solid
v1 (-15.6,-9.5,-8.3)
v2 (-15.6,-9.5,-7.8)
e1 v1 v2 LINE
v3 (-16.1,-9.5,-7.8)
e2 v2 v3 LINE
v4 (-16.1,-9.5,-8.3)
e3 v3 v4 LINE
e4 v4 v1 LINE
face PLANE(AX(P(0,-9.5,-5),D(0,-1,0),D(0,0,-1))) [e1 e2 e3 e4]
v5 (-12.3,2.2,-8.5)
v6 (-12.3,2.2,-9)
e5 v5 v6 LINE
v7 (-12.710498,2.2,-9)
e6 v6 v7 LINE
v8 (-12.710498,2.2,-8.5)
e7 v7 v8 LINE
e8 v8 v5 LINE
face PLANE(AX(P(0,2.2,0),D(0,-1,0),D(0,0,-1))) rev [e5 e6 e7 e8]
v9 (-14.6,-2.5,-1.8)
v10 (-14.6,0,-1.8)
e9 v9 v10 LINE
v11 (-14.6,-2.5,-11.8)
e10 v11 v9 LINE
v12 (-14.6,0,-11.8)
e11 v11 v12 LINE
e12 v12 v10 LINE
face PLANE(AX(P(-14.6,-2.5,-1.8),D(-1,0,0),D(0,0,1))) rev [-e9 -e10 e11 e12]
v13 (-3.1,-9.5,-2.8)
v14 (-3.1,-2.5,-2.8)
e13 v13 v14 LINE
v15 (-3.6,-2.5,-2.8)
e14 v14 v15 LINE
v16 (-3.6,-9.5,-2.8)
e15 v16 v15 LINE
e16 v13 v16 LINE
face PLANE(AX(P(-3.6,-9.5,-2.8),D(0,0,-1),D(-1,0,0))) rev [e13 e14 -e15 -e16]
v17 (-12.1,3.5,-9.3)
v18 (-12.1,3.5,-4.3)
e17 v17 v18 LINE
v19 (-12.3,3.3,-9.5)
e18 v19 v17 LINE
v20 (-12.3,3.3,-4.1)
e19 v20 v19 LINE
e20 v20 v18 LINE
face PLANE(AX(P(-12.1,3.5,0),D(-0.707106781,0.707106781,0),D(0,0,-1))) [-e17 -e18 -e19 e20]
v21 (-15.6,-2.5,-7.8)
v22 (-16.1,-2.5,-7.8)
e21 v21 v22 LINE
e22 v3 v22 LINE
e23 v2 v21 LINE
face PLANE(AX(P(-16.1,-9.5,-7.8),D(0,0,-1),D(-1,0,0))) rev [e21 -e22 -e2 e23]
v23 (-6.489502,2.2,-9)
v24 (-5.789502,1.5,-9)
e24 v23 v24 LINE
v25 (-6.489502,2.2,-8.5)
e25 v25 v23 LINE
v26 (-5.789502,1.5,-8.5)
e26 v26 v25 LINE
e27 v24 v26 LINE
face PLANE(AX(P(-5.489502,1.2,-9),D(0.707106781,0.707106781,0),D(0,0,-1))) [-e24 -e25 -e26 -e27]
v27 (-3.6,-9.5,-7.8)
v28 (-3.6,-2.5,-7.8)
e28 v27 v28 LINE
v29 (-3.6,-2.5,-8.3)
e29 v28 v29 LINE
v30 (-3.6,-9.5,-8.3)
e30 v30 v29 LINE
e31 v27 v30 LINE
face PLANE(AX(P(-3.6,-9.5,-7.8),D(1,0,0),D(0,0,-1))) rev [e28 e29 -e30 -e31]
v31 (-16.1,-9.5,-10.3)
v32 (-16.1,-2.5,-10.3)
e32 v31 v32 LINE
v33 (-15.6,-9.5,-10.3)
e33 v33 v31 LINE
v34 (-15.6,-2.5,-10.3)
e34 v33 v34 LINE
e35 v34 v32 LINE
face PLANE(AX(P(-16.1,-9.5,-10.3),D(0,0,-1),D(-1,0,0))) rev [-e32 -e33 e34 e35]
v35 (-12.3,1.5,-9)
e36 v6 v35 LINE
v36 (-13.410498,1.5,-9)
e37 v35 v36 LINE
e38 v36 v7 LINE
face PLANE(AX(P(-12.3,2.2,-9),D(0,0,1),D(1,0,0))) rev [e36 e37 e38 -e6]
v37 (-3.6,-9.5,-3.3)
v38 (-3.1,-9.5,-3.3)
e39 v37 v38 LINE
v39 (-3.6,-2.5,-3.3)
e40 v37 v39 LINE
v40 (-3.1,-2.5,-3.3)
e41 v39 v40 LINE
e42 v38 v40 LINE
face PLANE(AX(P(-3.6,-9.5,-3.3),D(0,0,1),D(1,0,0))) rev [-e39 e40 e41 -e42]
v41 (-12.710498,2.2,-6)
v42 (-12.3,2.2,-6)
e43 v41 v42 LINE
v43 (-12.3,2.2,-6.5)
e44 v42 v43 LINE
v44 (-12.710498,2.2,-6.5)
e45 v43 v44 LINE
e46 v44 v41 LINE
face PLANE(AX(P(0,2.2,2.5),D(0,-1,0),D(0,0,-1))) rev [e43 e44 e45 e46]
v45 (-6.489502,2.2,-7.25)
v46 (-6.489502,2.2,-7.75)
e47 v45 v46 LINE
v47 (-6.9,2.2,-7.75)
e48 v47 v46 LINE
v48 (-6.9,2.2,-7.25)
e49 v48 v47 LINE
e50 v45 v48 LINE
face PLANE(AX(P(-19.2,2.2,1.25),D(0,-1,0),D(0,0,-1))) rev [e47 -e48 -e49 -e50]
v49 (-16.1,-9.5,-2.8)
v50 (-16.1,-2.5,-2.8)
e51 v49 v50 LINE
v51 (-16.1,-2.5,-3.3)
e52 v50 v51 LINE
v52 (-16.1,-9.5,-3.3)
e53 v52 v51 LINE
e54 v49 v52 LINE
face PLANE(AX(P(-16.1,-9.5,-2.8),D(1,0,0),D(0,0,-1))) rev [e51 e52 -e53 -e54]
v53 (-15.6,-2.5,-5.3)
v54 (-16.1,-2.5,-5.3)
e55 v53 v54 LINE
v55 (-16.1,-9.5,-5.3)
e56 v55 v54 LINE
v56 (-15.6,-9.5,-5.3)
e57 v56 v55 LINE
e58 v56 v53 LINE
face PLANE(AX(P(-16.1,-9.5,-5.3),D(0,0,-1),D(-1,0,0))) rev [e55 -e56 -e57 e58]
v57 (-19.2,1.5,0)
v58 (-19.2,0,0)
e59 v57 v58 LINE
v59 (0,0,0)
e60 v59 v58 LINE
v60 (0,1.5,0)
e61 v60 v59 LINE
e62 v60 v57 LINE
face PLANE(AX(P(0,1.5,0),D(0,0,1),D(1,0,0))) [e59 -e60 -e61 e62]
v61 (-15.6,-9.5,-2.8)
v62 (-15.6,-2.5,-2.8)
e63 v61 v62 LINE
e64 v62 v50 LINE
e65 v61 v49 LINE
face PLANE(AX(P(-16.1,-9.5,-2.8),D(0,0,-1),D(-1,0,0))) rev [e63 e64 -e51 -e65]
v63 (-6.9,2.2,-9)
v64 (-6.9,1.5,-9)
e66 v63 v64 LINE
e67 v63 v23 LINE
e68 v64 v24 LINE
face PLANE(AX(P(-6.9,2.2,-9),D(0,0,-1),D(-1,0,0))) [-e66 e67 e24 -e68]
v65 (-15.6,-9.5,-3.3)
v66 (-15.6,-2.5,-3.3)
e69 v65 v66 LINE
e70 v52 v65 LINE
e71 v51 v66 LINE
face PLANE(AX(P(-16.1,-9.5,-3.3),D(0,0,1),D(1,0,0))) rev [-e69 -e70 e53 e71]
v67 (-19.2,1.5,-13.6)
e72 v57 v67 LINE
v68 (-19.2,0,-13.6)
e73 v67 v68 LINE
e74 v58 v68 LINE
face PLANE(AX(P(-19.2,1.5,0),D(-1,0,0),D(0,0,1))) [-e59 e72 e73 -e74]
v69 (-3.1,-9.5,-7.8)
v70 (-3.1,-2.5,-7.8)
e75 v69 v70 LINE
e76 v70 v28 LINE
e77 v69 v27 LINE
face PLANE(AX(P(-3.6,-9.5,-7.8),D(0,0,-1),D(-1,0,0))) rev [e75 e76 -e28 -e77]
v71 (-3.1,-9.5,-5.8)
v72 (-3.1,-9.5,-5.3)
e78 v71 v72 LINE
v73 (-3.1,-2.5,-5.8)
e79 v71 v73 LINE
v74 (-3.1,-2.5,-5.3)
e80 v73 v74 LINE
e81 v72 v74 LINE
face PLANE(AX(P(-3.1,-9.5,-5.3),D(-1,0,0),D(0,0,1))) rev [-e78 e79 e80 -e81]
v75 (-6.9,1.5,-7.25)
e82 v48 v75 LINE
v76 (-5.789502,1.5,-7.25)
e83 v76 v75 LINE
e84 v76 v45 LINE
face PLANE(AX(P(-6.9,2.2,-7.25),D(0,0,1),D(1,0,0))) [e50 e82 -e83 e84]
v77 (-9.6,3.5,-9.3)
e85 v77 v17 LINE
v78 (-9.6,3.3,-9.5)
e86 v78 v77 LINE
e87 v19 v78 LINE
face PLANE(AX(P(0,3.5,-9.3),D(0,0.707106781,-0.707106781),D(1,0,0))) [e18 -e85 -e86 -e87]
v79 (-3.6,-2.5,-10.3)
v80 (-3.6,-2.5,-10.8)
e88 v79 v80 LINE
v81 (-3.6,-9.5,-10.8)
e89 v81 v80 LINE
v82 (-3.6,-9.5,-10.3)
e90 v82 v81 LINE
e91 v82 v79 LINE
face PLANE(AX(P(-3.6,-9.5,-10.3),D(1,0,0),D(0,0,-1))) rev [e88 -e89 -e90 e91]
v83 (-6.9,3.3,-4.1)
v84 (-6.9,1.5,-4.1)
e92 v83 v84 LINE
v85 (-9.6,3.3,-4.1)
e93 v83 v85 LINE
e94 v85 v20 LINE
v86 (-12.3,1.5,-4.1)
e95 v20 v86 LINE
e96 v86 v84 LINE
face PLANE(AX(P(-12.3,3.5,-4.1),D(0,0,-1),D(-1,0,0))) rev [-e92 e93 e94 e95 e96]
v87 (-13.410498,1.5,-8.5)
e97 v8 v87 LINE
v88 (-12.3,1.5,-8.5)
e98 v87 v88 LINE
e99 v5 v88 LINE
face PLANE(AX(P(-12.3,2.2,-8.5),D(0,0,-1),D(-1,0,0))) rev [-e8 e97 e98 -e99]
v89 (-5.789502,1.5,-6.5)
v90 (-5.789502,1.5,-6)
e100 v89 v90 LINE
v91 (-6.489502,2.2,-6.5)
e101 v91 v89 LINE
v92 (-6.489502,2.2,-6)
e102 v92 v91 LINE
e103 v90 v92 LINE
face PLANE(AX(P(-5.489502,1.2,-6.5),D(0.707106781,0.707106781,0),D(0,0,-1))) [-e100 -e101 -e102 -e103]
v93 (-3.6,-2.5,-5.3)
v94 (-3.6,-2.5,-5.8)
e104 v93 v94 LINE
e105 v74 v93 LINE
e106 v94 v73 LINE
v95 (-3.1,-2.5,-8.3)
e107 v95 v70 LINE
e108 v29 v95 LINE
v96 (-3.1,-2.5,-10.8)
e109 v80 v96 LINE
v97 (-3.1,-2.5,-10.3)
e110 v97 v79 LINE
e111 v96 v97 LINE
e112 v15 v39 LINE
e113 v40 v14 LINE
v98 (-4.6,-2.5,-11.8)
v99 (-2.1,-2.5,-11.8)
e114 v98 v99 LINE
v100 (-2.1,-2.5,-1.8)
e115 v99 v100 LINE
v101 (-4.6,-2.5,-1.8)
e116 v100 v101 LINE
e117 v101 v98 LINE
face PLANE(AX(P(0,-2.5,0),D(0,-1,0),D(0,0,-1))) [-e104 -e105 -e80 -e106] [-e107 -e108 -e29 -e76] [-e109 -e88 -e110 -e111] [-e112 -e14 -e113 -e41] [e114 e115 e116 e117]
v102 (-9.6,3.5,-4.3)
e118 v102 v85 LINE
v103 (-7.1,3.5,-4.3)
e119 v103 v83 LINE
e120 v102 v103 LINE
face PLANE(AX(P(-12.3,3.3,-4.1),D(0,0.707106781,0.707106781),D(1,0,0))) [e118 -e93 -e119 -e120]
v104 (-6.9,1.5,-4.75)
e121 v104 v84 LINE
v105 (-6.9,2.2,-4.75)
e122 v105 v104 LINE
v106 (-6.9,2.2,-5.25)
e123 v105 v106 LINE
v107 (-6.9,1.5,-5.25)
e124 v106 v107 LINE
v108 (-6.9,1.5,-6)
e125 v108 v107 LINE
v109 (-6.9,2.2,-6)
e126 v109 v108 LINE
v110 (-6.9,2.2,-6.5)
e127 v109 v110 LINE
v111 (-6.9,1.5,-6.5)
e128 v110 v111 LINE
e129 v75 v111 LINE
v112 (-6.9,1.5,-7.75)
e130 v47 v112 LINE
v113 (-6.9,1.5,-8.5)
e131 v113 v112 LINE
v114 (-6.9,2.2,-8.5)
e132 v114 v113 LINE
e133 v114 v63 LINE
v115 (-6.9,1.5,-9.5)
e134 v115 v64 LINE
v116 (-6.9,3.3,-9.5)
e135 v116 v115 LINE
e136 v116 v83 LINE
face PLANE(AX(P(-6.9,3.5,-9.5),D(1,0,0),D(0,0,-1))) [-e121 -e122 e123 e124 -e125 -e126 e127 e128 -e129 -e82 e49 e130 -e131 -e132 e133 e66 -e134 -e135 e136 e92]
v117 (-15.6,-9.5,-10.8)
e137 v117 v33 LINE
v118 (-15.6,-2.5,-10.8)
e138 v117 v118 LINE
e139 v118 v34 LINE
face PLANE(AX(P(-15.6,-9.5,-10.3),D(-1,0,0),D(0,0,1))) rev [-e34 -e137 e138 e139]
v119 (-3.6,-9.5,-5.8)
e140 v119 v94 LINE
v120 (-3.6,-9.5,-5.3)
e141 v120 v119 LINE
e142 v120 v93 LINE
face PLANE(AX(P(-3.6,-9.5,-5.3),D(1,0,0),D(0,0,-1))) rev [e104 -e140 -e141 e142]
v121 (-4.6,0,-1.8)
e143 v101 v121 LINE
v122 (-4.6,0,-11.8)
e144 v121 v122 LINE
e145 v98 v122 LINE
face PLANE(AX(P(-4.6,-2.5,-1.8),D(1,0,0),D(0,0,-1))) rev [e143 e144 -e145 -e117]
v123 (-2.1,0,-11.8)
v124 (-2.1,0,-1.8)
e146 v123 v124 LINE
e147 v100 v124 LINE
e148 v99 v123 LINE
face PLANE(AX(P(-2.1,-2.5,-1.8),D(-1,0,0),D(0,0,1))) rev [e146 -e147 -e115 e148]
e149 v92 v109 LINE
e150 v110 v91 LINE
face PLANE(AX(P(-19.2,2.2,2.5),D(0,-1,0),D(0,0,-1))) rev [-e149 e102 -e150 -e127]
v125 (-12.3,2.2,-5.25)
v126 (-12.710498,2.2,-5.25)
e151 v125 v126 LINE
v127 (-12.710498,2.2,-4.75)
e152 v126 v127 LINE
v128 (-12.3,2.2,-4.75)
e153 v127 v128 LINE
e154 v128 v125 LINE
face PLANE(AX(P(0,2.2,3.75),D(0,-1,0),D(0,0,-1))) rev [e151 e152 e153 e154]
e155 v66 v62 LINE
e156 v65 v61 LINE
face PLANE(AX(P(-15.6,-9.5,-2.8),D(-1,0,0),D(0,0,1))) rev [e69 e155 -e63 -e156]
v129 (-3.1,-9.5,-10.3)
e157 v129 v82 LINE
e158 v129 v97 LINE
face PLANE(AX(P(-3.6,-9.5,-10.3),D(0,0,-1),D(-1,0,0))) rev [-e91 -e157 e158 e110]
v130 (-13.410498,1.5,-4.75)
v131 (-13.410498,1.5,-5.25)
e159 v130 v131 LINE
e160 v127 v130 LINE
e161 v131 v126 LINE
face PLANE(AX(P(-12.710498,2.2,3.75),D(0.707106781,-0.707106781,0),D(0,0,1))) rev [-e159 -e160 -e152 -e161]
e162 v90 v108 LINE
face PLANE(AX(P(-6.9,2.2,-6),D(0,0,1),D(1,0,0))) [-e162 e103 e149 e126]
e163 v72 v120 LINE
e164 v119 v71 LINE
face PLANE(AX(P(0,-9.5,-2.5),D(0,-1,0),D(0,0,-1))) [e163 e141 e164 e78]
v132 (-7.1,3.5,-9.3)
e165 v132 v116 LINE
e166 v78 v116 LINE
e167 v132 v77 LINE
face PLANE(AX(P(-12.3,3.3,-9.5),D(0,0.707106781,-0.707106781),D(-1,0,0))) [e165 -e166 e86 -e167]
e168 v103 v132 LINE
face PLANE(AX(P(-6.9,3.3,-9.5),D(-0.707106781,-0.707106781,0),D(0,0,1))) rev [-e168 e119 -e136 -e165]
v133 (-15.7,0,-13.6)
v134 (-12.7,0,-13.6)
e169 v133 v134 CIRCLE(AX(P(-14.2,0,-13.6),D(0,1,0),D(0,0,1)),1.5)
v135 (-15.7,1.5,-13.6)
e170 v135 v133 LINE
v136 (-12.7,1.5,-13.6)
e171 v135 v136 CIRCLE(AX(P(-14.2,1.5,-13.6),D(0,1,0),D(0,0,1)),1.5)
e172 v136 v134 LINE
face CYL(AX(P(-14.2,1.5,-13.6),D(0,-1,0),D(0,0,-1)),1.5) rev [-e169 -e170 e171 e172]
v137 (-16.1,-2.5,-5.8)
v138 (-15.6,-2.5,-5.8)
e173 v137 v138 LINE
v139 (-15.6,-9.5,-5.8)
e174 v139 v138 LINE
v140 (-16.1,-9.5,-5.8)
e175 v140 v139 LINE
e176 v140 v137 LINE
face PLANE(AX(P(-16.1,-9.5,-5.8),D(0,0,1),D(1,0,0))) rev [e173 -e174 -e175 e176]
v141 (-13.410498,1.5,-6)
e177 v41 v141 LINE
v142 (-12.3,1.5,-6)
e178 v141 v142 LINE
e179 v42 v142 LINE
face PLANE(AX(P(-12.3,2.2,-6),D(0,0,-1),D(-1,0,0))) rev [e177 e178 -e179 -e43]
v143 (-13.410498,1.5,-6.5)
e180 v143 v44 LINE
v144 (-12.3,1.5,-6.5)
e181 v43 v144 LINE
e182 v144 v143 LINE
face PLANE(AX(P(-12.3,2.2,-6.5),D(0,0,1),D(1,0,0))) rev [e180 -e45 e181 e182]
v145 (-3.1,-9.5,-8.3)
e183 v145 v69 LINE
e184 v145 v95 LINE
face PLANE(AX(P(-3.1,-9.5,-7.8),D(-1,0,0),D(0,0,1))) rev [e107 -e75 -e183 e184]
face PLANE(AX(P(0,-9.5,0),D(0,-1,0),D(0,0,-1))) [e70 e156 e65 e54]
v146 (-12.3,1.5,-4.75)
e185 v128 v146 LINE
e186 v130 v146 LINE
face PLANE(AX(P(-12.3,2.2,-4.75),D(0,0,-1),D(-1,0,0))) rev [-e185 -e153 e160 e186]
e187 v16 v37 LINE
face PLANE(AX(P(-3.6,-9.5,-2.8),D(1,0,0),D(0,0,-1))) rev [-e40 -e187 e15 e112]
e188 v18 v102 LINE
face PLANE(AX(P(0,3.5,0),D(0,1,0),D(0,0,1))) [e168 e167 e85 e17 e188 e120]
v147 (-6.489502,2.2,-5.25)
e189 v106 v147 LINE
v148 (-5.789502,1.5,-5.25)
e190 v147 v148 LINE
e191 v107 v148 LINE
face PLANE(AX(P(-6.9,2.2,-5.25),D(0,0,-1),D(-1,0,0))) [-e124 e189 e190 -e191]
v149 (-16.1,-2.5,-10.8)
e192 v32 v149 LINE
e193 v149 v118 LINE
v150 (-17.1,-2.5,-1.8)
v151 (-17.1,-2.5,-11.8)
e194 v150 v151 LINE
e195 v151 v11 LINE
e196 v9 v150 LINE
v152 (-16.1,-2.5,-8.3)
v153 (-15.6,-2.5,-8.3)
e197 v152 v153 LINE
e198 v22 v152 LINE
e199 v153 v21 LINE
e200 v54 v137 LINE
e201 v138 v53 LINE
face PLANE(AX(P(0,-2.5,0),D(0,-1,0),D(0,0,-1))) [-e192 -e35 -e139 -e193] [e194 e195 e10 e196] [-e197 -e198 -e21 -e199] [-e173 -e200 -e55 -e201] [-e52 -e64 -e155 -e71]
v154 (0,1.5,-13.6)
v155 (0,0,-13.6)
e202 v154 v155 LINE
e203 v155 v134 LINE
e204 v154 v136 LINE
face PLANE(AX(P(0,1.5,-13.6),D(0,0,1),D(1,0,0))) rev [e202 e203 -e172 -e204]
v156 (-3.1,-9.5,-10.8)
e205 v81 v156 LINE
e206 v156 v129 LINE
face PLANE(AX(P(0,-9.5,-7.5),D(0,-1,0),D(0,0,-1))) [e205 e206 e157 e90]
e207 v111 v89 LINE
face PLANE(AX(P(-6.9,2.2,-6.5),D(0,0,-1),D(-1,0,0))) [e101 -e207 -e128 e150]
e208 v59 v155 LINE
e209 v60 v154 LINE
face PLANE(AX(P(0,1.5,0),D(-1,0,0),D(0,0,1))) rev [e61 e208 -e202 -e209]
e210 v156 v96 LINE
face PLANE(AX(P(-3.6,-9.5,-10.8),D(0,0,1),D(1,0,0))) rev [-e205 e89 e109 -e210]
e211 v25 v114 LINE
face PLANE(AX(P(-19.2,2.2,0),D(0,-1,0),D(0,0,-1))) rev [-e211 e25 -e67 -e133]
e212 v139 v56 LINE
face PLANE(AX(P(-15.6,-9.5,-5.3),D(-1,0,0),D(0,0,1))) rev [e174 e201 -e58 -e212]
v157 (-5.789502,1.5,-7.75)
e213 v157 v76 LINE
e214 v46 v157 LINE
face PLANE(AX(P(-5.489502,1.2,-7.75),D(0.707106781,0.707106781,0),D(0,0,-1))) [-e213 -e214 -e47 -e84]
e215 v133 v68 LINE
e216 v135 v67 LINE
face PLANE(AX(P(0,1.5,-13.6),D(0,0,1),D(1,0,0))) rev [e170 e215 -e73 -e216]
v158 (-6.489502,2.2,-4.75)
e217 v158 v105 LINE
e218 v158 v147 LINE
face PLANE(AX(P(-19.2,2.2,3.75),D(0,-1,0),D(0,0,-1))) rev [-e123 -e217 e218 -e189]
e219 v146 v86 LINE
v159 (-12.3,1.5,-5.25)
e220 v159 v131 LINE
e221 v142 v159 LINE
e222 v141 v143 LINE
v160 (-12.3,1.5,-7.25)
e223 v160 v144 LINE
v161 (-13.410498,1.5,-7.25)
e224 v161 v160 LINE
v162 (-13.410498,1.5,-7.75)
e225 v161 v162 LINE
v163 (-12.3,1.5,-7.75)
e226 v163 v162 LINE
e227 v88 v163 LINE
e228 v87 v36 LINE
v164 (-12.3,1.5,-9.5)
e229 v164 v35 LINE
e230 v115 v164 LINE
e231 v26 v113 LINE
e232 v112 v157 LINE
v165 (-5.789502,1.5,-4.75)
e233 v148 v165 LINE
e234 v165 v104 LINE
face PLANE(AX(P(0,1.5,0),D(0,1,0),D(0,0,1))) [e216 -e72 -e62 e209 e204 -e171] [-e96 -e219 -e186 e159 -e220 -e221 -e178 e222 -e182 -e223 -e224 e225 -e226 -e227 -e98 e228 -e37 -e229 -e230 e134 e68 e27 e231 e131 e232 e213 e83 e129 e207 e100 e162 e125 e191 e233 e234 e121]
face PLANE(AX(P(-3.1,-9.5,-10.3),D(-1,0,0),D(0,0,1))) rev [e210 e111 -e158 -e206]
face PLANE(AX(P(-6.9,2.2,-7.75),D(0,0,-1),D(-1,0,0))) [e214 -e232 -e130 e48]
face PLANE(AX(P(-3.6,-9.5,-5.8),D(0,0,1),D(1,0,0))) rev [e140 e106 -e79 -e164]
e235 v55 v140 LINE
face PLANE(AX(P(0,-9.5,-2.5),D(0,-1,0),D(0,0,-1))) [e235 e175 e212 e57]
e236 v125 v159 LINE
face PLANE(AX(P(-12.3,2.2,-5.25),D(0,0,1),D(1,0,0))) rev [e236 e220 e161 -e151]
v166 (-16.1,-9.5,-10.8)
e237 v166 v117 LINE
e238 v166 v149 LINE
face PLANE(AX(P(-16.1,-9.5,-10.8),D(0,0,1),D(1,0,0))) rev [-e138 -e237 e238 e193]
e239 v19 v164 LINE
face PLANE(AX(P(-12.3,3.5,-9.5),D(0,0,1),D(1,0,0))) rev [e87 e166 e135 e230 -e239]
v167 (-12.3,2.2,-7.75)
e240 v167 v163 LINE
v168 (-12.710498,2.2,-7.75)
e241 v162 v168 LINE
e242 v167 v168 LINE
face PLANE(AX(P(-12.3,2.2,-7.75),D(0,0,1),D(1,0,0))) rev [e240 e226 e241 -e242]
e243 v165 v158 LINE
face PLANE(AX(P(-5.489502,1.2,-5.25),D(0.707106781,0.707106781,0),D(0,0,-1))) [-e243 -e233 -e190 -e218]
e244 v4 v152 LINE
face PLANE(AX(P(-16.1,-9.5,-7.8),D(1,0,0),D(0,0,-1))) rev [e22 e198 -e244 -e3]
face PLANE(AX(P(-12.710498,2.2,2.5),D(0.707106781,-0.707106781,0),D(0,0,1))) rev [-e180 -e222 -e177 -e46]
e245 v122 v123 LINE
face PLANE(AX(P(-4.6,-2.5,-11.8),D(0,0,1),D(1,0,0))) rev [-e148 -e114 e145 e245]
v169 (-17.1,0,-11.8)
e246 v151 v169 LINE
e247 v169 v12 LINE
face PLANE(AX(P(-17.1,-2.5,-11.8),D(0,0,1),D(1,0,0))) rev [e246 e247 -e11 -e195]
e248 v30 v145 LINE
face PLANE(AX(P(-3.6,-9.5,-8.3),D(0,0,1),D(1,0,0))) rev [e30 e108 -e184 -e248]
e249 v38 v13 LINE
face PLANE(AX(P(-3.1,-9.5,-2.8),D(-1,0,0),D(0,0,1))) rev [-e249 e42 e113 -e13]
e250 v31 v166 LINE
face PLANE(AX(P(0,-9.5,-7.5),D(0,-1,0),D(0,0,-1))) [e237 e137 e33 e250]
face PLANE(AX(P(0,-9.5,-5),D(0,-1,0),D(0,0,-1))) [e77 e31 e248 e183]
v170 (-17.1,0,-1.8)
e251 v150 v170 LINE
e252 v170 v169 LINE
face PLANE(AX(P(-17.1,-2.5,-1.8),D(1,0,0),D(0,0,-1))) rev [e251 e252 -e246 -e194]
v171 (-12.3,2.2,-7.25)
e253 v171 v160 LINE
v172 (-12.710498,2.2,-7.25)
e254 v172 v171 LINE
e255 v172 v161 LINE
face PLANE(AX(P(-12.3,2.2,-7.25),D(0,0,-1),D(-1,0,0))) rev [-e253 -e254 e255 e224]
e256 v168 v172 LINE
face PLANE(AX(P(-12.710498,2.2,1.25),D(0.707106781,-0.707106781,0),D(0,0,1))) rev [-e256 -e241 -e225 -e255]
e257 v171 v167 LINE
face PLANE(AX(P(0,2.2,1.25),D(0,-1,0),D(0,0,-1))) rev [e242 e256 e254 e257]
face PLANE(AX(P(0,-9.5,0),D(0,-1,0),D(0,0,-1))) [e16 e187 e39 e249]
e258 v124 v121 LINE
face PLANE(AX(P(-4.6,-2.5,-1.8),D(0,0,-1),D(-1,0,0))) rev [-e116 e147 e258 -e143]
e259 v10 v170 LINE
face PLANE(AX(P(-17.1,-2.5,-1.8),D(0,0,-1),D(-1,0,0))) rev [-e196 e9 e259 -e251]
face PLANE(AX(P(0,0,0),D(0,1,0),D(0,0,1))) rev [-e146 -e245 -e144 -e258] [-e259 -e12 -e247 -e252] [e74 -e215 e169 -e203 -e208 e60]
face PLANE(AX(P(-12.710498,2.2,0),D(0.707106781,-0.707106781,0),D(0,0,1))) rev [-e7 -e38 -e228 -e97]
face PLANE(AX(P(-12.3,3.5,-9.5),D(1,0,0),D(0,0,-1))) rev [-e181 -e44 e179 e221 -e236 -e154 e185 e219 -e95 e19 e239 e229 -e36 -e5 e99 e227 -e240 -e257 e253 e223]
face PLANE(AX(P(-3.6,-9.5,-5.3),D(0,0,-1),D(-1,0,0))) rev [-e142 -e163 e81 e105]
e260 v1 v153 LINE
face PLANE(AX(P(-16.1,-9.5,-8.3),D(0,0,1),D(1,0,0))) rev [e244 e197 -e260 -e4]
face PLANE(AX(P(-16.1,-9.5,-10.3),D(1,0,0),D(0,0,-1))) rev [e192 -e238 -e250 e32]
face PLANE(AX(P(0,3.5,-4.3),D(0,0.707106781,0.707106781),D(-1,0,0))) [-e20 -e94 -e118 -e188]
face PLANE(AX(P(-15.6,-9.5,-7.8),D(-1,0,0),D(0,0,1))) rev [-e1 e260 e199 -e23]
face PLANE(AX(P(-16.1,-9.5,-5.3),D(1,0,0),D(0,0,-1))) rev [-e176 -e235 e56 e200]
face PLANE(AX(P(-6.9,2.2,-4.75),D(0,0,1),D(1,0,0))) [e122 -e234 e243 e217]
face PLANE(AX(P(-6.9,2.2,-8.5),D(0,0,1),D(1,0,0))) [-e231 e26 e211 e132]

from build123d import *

# Parameters (mm, degrees)
BOSS_EXTRUDE1_DEPTH        = 1.5
SKETCH2_W                  = 2.7
SKETCH2_H                  = 5.4
BOSS_EXTRUDE2_DEPTH        = 2
CHAMFER1_SIZE              = 0.2
SKETCH3_W                  = 1.410498469
SKETCH3_H                  = 0.5
BOSS_EXTRUDE3_DEPTH        = 0.7
CHAMFER2_SIZE              = 1
LPATTERN2_COUNT            = 4
LPATTERN2_PITCH            = 1.25
CHAMFER2_OF_LPATTERN2_SIZE = 1
MIRROR1_START              = -9.5
MIRROR1_DEPTH              = 5.4
MIRROR1_START_2            = -9
MIRROR1_2_DEPTH            = 0.5
MIRROR1_START_3            = -7.75
MIRROR1_3_DEPTH            = 0.5
MIRROR1_START_4            = -6.5
MIRROR1_4_DEPTH            = 0.5
MIRROR1_START_5            = -5.25
MIRROR1_5_DEPTH            = 0.5
MIRROR1_START_6            = -0.565685425
MIRROR1_6_OUTLINE_W        = 4.6
MIRROR1_6_OUTLINE_H        = 5.050966799
MIRROR1_6_DEPTH            = 1.565685425
MIRROR1_START_7            = -5
MIRROR1_7_OUTLINE_W        = 4.6
MIRROR1_7_OUTLINE_H        = 1.949033201
MIRROR1_7_DEPTH            = 4.434314575
SKETCH5_W                  = 2.5
SKETCH5_H                  = 10
BOSS_EXTRUDE4_DEPTH        = 2.5
SKETCH6_W                  = 0.5
SKETCH6_H                  = 0.5
BOSS_EXTRUDE5_DEPTH        = 7
LPATTERN3_COUNT            = 4
LPATTERN3_PITCH            = 2.5


with BuildPart() as part:
    # Sketch1 → Boss-Extrude1 (new body)
    with BuildSketch(Plane(origin=(0, 0, 0), x_dir=(1, 0, 0), z_dir=(0, 1, 0))):
        with BuildLine():
            Line((-19.2, 0), (0, 0))
            Line((0, 0), (0, 13.6))
            Line((0, 13.6), (-12.7, 13.6))
            ThreePointArc((-12.7, 13.6), (-14.2, 12.1), (-15.7, 13.6))
            Line((-15.7, 13.6), (-19.2, 13.6))
            Line((-19.2, 13.6), (-19.2, 0))
        make_face()
    extrude(amount=BOSS_EXTRUDE1_DEPTH)

    # Sketch2 → Boss-Extrude2 (add)
    with BuildSketch(Plane(origin=(0, 1.5, 0), x_dir=(1, 0, 0), z_dir=(0, 1, 0))):
        with Locations((-10.95, 6.8)):
            Rectangle(SKETCH2_W, SKETCH2_H)
    extrude(amount=BOSS_EXTRUDE2_DEPTH)

    # Chamfer1
    chamfer1_edges = [part.edges().sort_by_distance(p)[0] for p in [
        (-12.3, 3.5, -6.8),
        (-10.95, 3.5, -4.1),
        (-10.95, 3.5, -9.5),
    ]]
    chamfer(chamfer1_edges, length=CHAMFER1_SIZE)

    # Sketch3 → Boss-Extrude3 (add)
    with BuildSketch(Plane(origin=(0, 1.5, 0), x_dir=(1, 0, 0), z_dir=(0, 1, 0))):
        with Locations((-13.005249235, 8.75)):
            Rectangle(SKETCH3_W, SKETCH3_H)
    boss_extrude3 = extrude(amount=BOSS_EXTRUDE3_DEPTH)

    # Chamfer2
    # the kernel refuses this chamfer: 1 mm, written as the material it takes off along each edge
    with BuildSketch(Plane(origin=(-13.710498469, 2.2, -11.571682988), x_dir=(1, 0, 0), z_dir=(0, 0, 1))) as chamfer2_piece_1_section:
        Polygon((CHAMFER2_SIZE, 0), (0, -CHAMFER2_SIZE), (0, 0), align=None)
    chamfer2_piece_1 = extrude(amount=5.643365976, mode=Mode.PRIVATE)
    chamfer2_piece_1 = split(chamfer2_piece_1, bisect_by=Plane(origin=(-13.710498469, 1.5, -11.571682988), z_dir=(0, 1, 0)), keep=Keep.TOP, mode=Mode.PRIVATE)
    add(chamfer2_piece_1, mode=Mode.SUBTRACT)

    # LPattern2: Boss-Extrude3 ×4
    with Locations(*[(0, 0, i * LPATTERN2_PITCH) for i in range(1, LPATTERN2_COUNT)]):
        add(boss_extrude3)

    # Chamfer2 of LPattern2
    # the kernel refuses this chamfer: 1 mm, written as the material it takes off along each edge
    with BuildSketch(Plane(origin=(-13.710498469, 2.2, -10.321682988), x_dir=(1, 0, 0), z_dir=(0, 0, 1))) as chamfer2_of_lpattern2_piece_1_section:
        Polygon((CHAMFER2_OF_LPATTERN2_SIZE, 0), (0, -CHAMFER2_OF_LPATTERN2_SIZE), (0, 0), align=None)
    chamfer2_of_lpattern2_piece_1 = extrude(amount=5.643365976, mode=Mode.PRIVATE)
    chamfer2_of_lpattern2_piece_1 = split(chamfer2_of_lpattern2_piece_1, bisect_by=Plane(origin=(-13.710498469, 1.5, -10.321682988), z_dir=(0, 1, 0)), keep=Keep.TOP, mode=Mode.PRIVATE)
    add(chamfer2_of_lpattern2_piece_1, mode=Mode.SUBTRACT)
    with BuildSketch(Plane(origin=(-13.710498469, 2.2, -9.071682988), x_dir=(1, 0, 0), z_dir=(0, 0, 1))) as chamfer2_of_lpattern2_piece_2_section:
        Polygon((CHAMFER2_OF_LPATTERN2_SIZE, 0), (0, -CHAMFER2_OF_LPATTERN2_SIZE), (0, 0), align=None)
    chamfer2_of_lpattern2_piece_2 = extrude(amount=5.643365976, mode=Mode.PRIVATE)
    chamfer2_of_lpattern2_piece_2 = split(chamfer2_of_lpattern2_piece_2, bisect_by=Plane(origin=(-13.710498469, 1.5, -9.071682988), z_dir=(0, 1, 0)), keep=Keep.TOP, mode=Mode.PRIVATE)
    add(chamfer2_of_lpattern2_piece_2, mode=Mode.SUBTRACT)
    with BuildSketch(Plane(origin=(-13.710498469, 2.2, -7.821682988), x_dir=(1, 0, 0), z_dir=(0, 0, 1))) as chamfer2_of_lpattern2_piece_3_section:
        Polygon((CHAMFER2_OF_LPATTERN2_SIZE, 0), (0, -CHAMFER2_OF_LPATTERN2_SIZE), (0, 0), align=None)
    chamfer2_of_lpattern2_piece_3 = extrude(amount=5.643365976, mode=Mode.PRIVATE)
    chamfer2_of_lpattern2_piece_3 = split(chamfer2_of_lpattern2_piece_3, bisect_by=Plane(origin=(-13.710498469, 1.5, -7.821682988), z_dir=(0, 1, 0)), keep=Keep.TOP, mode=Mode.PRIVATE)
    add(chamfer2_of_lpattern2_piece_3, mode=Mode.SUBTRACT)

    # Mirror1: read off the stored shape, not the designer's step
    # Mirror1 outline → Mirror1 (add)
    with BuildSketch(Plane.XY.offset(MIRROR1_START)):
        Polygon((-6.9, 3.3), (-7.1, 3.5), (-9.6, 3.5), (-9.6, 1.5), (-6.9, 1.5), align=None)
    extrude(amount=MIRROR1_DEPTH)

    # Mirror1 2 outline → Mirror1 2 (add)
    with BuildSketch(Plane.XY.offset(MIRROR1_START_2)):
        Polygon((-6.489501531, 2.2), (-6.9, 2.2), (-6.9, 1.5), (-5.789501531, 1.5), align=None)
    extrude(amount=MIRROR1_2_DEPTH)

    # Mirror1 3 outline → Mirror1 3 (add)
    with BuildSketch(Plane.XY.offset(MIRROR1_START_3)):
        Polygon((-6.489501531, 2.2), (-6.9, 2.2), (-6.9, 1.5), (-5.789501531, 1.5), align=None)
    extrude(amount=MIRROR1_3_DEPTH)

    # Mirror1 4 outline → Mirror1 4 (add)
    with BuildSketch(Plane.XY.offset(MIRROR1_START_4)):
        Polygon((-6.489501531, 2.2), (-6.9, 2.2), (-6.9, 1.5), (-5.789501531, 1.5), align=None)
    extrude(amount=MIRROR1_4_DEPTH)

    # Mirror1 5 outline → Mirror1 5 (add)
    with BuildSketch(Plane.XY.offset(MIRROR1_START_5)):
        Polygon((-6.489501531, 2.2), (-6.9, 2.2), (-6.9, 1.5), (-5.789501531, 1.5), align=None)
    extrude(amount=MIRROR1_5_DEPTH)

    # Mirror1 6 outline → Mirror1 6 (cut)
    with BuildSketch(Plane(origin=(0, 0, 0), x_dir=(1, 0, 0), z_dir=(0, 0.707106781186545, 0.70710678118655)).offset(MIRROR1_START_6)):
        with Locations((-7.3, 6.5254834)):
            Rectangle(MIRROR1_6_OUTLINE_W, MIRROR1_6_OUTLINE_H)
    extrude(amount=MIRROR1_6_DEPTH, mode=Mode.SUBTRACT)

    # Mirror1 7 outline → Mirror1 7 (cut)
    with BuildSketch(Plane(origin=(0, 0, 0), x_dir=(1, 0, 0), z_dir=(0, 0.707106781186545, 0.70710678118655)).offset(MIRROR1_START_7)):
        with Locations((-7.3, 10.0254834)):
            Rectangle(MIRROR1_7_OUTLINE_W, MIRROR1_7_OUTLINE_H)
    extrude(amount=MIRROR1_7_DEPTH, mode=Mode.SUBTRACT)

    # Sketch5 → Boss-Extrude4 (add)
    with BuildSketch(Plane.XZ):
        with Locations((-15.85, -6.8)):
            Rectangle(SKETCH5_W, SKETCH5_H)
        with Locations((-3.35, -6.8)):
            Rectangle(SKETCH5_W, SKETCH5_H)
    extrude(amount=BOSS_EXTRUDE4_DEPTH)

    # Sketch6 → Boss-Extrude5 (add)
    with BuildSketch(Plane.XZ.offset(2.5)):
        with Locations((-15.85, -3.05)):
            Rectangle(SKETCH6_W, SKETCH6_H)
        with Locations((-3.35, -3.05)):
            Rectangle(SKETCH6_W, SKETCH6_H)
    boss_extrude5 = extrude(amount=BOSS_EXTRUDE5_DEPTH)

    # LPattern3: Boss-Extrude5 ×4
    with Locations(*[(0, 0, -i * LPATTERN3_PITCH) for i in range(1, LPATTERN3_COUNT)]):
        add(boss_extrude5)


solid = part.part
